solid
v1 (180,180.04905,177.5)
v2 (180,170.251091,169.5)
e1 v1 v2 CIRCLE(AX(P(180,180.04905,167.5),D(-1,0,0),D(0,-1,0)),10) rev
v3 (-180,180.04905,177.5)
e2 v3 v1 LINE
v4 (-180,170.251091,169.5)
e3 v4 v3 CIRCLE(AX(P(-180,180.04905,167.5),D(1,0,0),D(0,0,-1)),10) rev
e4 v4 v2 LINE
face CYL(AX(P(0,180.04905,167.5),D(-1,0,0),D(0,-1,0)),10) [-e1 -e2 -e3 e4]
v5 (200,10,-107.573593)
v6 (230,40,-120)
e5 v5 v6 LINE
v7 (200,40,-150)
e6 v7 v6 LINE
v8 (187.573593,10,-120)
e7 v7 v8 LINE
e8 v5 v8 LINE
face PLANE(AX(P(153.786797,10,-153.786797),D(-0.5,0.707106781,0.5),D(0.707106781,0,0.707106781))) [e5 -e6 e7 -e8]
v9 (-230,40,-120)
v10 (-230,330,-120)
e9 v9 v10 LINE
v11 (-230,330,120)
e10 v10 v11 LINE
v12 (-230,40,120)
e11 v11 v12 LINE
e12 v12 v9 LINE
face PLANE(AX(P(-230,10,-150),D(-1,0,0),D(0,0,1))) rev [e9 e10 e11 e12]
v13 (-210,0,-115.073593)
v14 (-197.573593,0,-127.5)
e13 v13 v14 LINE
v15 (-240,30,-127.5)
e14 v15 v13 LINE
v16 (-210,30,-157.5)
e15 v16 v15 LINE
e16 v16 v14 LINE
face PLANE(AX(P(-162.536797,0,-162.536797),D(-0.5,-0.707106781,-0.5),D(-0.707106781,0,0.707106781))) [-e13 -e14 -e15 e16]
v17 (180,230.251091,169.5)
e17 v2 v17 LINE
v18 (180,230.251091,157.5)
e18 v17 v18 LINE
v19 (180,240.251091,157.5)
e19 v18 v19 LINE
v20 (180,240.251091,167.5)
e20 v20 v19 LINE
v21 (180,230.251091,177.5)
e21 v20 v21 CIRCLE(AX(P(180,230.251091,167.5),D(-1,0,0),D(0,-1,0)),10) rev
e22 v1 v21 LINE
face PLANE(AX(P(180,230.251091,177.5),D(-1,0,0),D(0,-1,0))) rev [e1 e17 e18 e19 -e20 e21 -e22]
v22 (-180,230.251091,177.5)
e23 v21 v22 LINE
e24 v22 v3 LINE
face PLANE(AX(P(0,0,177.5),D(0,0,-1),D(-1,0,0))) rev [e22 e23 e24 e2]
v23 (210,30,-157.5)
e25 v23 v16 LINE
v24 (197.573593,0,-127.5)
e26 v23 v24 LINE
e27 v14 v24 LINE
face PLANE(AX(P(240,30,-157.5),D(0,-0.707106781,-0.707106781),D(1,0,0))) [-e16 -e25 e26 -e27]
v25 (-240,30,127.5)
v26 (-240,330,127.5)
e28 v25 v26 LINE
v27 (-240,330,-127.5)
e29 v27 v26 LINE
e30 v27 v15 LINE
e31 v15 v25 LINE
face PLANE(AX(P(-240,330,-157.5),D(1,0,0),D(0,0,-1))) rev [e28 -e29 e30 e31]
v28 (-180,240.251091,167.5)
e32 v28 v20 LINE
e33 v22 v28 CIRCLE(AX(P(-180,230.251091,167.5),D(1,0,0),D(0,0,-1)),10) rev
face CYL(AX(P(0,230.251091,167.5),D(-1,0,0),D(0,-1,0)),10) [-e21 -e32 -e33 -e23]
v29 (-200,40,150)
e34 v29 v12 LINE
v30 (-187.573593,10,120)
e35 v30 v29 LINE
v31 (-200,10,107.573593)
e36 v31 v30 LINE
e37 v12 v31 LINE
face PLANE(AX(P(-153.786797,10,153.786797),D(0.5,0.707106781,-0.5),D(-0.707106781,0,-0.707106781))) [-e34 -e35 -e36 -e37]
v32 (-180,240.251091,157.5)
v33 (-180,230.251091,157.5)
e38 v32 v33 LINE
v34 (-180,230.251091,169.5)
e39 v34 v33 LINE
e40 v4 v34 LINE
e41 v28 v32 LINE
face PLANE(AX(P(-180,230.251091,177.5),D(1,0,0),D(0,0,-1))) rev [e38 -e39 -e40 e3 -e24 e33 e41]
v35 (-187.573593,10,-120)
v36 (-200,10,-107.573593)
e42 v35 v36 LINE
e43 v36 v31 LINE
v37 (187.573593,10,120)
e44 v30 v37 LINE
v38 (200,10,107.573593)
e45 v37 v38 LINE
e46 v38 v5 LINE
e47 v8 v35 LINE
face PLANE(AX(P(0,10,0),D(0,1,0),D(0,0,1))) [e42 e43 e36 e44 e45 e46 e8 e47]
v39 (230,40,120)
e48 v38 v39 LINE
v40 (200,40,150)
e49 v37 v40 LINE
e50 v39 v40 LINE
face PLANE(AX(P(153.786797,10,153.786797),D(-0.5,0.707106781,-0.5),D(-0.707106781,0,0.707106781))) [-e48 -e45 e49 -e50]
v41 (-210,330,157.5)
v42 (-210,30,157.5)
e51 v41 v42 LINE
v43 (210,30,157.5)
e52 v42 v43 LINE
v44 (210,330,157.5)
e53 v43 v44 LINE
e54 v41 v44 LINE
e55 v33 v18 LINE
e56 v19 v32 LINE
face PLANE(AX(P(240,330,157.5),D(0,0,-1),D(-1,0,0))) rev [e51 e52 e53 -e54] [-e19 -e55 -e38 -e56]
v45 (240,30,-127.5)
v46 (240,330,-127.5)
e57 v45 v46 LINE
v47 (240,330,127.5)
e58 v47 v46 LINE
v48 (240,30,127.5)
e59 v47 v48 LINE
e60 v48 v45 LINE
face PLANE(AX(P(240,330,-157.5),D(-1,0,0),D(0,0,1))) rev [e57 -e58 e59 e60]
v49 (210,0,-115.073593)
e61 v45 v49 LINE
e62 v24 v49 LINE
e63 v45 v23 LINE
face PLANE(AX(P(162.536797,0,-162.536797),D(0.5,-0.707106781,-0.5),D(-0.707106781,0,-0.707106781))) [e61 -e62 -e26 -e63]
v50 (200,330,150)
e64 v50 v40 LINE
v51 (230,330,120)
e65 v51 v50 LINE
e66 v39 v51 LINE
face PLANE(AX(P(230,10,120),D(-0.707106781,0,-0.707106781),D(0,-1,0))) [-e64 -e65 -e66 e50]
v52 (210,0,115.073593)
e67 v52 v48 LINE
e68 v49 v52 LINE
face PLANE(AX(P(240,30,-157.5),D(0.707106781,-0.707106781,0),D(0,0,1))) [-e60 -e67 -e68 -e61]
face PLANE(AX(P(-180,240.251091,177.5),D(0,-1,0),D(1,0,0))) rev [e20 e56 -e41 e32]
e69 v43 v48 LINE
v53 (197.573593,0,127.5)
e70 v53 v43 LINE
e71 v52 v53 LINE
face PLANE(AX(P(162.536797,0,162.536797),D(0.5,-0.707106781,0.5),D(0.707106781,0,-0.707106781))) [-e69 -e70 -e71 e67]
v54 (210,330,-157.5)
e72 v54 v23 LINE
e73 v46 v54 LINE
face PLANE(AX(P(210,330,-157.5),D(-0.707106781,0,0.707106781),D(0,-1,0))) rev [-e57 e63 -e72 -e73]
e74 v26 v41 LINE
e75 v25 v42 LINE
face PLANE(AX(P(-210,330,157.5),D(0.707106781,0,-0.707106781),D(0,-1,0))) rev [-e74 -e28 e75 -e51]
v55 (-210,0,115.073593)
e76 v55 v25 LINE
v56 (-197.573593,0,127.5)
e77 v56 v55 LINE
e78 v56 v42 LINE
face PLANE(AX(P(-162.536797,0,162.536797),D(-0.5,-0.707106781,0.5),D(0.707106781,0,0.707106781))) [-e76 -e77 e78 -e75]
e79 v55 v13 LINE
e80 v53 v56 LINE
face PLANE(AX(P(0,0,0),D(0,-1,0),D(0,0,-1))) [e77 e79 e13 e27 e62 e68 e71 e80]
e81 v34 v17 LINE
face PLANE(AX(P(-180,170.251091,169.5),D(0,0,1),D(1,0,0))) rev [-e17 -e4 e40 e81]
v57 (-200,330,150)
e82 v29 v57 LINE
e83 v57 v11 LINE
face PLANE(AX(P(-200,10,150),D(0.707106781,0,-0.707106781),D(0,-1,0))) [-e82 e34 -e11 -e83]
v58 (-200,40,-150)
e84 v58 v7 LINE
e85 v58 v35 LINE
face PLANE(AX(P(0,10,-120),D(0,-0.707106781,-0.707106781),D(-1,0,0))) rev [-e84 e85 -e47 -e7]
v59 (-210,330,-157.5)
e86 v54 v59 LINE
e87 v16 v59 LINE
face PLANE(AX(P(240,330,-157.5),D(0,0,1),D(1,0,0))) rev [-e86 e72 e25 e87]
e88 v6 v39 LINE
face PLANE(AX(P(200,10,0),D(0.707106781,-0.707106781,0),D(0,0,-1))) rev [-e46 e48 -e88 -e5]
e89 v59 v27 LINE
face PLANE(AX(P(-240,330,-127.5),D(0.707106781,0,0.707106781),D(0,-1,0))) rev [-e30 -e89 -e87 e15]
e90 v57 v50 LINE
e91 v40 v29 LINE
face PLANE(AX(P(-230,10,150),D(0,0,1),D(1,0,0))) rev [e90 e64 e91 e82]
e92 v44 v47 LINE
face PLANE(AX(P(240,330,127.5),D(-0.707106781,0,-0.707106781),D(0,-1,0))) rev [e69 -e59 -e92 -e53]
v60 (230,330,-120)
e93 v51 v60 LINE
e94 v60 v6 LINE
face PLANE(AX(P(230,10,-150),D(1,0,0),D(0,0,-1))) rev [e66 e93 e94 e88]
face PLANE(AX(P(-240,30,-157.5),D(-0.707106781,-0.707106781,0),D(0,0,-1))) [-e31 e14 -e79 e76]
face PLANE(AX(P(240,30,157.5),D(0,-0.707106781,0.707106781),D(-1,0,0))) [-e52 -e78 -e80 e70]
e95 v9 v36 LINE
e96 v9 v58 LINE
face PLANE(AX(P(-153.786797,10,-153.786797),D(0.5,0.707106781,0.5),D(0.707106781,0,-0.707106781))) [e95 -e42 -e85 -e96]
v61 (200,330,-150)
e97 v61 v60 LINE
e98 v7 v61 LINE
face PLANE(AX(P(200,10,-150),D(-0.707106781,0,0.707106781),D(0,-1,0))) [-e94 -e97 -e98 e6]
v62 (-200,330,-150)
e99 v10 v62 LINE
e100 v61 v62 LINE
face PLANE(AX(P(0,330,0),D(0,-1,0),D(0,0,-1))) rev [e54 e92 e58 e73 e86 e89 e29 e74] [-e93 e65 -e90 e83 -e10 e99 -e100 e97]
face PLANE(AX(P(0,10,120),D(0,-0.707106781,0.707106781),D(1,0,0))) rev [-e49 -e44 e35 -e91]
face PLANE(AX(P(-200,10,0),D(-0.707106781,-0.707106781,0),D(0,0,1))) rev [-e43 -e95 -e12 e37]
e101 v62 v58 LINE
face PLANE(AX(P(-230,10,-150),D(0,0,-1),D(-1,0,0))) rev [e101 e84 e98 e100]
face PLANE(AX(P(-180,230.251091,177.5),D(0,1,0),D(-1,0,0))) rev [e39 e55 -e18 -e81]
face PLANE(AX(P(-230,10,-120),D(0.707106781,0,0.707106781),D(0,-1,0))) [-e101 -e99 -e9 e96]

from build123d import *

# Parameters (mm, degrees)
SKETCH1_W           = 480
SKETCH1_H           = 315
BOSS_EXTRUDE1_DEPTH = 330
SKETCH9_W           = 460
SKETCH9_H           = 300
CUT_EXTRUDE1_DEPTH  = 320
CHAMFER1_SIZE       = 30
CHAMFER2_SIZE       = 30
SKETCH11_W          = 360
SKETCH11_H          = 10
BOSS_EXTRUDE2_DEPTH = 20
SKETCH12_W          = 360
SKETCH12_H          = 8
BOSS_EXTRUDE3_DEPTH = 60
FILLET1_R           = 10


with BuildPart() as part:
    # Sketch1 → Boss-Extrude1 (new body)
    with BuildSketch(Plane(origin=(0, 0, 0), x_dir=(1, 0, 0), z_dir=(0, 1, 0))):
        Rectangle(SKETCH1_W, SKETCH1_H)
    extrude(amount=BOSS_EXTRUDE1_DEPTH)

    # Sketch9 → Cut-Extrude1 (cut)
    with BuildSketch(Plane(origin=(0, 330, 0), x_dir=(1, 0, 0), z_dir=(0, 1, 0))):
        Rectangle(SKETCH9_W, SKETCH9_H)
    extrude(amount=-CUT_EXTRUDE1_DEPTH, mode=Mode.SUBTRACT)

    # Chamfer1
    chamfer1_edges = [part.edges().sort_by_distance(p)[0] for p in [
        (230, 170, -150),
        (230, 170, 150),
        (-230, 170, 150),
        (-230, 170, -150),
        (-240, 165, -157.5),
        (240, 165, -157.5),
        (240, 165, 157.5),
        (-240, 165, 157.5),
    ]]
    chamfer(chamfer1_edges, length=CHAMFER1_SIZE)

    # Chamfer2
    chamfer2_edges = [part.edges().sort_by_distance(p)[0] for p in [
        (0, 0, -157.5),
        (-240, 0, 0),
        (240, 0, 0),
        (0, 0, 157.5),
        (225, 0, 142.5),
        (-225, 0, 142.5),
        (-225, 0, -142.5),
        (225, 0, -142.5),
        (230, 10, 0),
        (0, 10, 150),
        (0, 10, -150),
        (-230, 10, 0),
        (215, 10, -135),
        (-215, 10, -135),
        (-215, 10, 135),
        (215, 10, 135),
    ]]
    chamfer(chamfer2_edges, length=CHAMFER2_SIZE)

    # Sketch11 → Boss-Extrude2 (add)
    with BuildSketch(Plane.XY.offset(157.5)):
        with Locations((0, 235.251091022)):
            Rectangle(SKETCH11_W, SKETCH11_H)
    extrude(amount=BOSS_EXTRUDE2_DEPTH)

    # Sketch12 → Boss-Extrude3 (add)
    with BuildSketch(Plane.XZ.offset(-230.251091022)):
        with Locations((0, 173.5)):
            Rectangle(SKETCH12_W, SKETCH12_H)
    extrude(amount=BOSS_EXTRUDE3_DEPTH)

    # Fillet1
    # the kernel refuses this fillet: 10 mm, written as the material it takes off along each edge
    with BuildSketch(Plane(origin=(-204.494897428, 170.251091022, 177.5), x_dir=(0, 0, -1), z_dir=(1, 0, 0))) as fillet1_piece_1:
        with BuildLine():
            CenterArc((10, 9.797958971), FILLET1_R, 180, 78.463040967)
            Line((0, 9.797958971), (-0.2, 9.797958971))
            Line((-0.2, 9.797958971), (-0.2, 0))
            Line((-0.2, 0), (0, -0.2))
            ThreePointArc((0, -0.2), (4, -0.2), (7.96, -0.195959179))
            Line((7.96, -0.195959179), (8, 0))
        make_face()
    extrude(amount=408.989794856, mode=Mode.SUBTRACT)
    with BuildSketch(Plane(origin=(205, 240.251091022, 177.5), x_dir=(0, -1, 0), z_dir=(-1, 0, 0))) as fillet1_piece_2:
        with BuildLine():
            CenterArc((FILLET1_R, -FILLET1_R), FILLET1_R, 90, 90)
            Line((0, -FILLET1_R), (-FILLET1_R * 0.02, -FILLET1_R))
            Line((-FILLET1_R * 0.02, -FILLET1_R), (-FILLET1_R * 0.02, FILLET1_R * 0.02))
            Line((-FILLET1_R * 0.02, FILLET1_R * 0.02), (FILLET1_R, FILLET1_R * 0.02))
            Line((FILLET1_R, FILLET1_R * 0.02), (FILLET1_R, 0))
        make_face()
    extrude(amount=410, mode=Mode.SUBTRACT)


solid = part.part
